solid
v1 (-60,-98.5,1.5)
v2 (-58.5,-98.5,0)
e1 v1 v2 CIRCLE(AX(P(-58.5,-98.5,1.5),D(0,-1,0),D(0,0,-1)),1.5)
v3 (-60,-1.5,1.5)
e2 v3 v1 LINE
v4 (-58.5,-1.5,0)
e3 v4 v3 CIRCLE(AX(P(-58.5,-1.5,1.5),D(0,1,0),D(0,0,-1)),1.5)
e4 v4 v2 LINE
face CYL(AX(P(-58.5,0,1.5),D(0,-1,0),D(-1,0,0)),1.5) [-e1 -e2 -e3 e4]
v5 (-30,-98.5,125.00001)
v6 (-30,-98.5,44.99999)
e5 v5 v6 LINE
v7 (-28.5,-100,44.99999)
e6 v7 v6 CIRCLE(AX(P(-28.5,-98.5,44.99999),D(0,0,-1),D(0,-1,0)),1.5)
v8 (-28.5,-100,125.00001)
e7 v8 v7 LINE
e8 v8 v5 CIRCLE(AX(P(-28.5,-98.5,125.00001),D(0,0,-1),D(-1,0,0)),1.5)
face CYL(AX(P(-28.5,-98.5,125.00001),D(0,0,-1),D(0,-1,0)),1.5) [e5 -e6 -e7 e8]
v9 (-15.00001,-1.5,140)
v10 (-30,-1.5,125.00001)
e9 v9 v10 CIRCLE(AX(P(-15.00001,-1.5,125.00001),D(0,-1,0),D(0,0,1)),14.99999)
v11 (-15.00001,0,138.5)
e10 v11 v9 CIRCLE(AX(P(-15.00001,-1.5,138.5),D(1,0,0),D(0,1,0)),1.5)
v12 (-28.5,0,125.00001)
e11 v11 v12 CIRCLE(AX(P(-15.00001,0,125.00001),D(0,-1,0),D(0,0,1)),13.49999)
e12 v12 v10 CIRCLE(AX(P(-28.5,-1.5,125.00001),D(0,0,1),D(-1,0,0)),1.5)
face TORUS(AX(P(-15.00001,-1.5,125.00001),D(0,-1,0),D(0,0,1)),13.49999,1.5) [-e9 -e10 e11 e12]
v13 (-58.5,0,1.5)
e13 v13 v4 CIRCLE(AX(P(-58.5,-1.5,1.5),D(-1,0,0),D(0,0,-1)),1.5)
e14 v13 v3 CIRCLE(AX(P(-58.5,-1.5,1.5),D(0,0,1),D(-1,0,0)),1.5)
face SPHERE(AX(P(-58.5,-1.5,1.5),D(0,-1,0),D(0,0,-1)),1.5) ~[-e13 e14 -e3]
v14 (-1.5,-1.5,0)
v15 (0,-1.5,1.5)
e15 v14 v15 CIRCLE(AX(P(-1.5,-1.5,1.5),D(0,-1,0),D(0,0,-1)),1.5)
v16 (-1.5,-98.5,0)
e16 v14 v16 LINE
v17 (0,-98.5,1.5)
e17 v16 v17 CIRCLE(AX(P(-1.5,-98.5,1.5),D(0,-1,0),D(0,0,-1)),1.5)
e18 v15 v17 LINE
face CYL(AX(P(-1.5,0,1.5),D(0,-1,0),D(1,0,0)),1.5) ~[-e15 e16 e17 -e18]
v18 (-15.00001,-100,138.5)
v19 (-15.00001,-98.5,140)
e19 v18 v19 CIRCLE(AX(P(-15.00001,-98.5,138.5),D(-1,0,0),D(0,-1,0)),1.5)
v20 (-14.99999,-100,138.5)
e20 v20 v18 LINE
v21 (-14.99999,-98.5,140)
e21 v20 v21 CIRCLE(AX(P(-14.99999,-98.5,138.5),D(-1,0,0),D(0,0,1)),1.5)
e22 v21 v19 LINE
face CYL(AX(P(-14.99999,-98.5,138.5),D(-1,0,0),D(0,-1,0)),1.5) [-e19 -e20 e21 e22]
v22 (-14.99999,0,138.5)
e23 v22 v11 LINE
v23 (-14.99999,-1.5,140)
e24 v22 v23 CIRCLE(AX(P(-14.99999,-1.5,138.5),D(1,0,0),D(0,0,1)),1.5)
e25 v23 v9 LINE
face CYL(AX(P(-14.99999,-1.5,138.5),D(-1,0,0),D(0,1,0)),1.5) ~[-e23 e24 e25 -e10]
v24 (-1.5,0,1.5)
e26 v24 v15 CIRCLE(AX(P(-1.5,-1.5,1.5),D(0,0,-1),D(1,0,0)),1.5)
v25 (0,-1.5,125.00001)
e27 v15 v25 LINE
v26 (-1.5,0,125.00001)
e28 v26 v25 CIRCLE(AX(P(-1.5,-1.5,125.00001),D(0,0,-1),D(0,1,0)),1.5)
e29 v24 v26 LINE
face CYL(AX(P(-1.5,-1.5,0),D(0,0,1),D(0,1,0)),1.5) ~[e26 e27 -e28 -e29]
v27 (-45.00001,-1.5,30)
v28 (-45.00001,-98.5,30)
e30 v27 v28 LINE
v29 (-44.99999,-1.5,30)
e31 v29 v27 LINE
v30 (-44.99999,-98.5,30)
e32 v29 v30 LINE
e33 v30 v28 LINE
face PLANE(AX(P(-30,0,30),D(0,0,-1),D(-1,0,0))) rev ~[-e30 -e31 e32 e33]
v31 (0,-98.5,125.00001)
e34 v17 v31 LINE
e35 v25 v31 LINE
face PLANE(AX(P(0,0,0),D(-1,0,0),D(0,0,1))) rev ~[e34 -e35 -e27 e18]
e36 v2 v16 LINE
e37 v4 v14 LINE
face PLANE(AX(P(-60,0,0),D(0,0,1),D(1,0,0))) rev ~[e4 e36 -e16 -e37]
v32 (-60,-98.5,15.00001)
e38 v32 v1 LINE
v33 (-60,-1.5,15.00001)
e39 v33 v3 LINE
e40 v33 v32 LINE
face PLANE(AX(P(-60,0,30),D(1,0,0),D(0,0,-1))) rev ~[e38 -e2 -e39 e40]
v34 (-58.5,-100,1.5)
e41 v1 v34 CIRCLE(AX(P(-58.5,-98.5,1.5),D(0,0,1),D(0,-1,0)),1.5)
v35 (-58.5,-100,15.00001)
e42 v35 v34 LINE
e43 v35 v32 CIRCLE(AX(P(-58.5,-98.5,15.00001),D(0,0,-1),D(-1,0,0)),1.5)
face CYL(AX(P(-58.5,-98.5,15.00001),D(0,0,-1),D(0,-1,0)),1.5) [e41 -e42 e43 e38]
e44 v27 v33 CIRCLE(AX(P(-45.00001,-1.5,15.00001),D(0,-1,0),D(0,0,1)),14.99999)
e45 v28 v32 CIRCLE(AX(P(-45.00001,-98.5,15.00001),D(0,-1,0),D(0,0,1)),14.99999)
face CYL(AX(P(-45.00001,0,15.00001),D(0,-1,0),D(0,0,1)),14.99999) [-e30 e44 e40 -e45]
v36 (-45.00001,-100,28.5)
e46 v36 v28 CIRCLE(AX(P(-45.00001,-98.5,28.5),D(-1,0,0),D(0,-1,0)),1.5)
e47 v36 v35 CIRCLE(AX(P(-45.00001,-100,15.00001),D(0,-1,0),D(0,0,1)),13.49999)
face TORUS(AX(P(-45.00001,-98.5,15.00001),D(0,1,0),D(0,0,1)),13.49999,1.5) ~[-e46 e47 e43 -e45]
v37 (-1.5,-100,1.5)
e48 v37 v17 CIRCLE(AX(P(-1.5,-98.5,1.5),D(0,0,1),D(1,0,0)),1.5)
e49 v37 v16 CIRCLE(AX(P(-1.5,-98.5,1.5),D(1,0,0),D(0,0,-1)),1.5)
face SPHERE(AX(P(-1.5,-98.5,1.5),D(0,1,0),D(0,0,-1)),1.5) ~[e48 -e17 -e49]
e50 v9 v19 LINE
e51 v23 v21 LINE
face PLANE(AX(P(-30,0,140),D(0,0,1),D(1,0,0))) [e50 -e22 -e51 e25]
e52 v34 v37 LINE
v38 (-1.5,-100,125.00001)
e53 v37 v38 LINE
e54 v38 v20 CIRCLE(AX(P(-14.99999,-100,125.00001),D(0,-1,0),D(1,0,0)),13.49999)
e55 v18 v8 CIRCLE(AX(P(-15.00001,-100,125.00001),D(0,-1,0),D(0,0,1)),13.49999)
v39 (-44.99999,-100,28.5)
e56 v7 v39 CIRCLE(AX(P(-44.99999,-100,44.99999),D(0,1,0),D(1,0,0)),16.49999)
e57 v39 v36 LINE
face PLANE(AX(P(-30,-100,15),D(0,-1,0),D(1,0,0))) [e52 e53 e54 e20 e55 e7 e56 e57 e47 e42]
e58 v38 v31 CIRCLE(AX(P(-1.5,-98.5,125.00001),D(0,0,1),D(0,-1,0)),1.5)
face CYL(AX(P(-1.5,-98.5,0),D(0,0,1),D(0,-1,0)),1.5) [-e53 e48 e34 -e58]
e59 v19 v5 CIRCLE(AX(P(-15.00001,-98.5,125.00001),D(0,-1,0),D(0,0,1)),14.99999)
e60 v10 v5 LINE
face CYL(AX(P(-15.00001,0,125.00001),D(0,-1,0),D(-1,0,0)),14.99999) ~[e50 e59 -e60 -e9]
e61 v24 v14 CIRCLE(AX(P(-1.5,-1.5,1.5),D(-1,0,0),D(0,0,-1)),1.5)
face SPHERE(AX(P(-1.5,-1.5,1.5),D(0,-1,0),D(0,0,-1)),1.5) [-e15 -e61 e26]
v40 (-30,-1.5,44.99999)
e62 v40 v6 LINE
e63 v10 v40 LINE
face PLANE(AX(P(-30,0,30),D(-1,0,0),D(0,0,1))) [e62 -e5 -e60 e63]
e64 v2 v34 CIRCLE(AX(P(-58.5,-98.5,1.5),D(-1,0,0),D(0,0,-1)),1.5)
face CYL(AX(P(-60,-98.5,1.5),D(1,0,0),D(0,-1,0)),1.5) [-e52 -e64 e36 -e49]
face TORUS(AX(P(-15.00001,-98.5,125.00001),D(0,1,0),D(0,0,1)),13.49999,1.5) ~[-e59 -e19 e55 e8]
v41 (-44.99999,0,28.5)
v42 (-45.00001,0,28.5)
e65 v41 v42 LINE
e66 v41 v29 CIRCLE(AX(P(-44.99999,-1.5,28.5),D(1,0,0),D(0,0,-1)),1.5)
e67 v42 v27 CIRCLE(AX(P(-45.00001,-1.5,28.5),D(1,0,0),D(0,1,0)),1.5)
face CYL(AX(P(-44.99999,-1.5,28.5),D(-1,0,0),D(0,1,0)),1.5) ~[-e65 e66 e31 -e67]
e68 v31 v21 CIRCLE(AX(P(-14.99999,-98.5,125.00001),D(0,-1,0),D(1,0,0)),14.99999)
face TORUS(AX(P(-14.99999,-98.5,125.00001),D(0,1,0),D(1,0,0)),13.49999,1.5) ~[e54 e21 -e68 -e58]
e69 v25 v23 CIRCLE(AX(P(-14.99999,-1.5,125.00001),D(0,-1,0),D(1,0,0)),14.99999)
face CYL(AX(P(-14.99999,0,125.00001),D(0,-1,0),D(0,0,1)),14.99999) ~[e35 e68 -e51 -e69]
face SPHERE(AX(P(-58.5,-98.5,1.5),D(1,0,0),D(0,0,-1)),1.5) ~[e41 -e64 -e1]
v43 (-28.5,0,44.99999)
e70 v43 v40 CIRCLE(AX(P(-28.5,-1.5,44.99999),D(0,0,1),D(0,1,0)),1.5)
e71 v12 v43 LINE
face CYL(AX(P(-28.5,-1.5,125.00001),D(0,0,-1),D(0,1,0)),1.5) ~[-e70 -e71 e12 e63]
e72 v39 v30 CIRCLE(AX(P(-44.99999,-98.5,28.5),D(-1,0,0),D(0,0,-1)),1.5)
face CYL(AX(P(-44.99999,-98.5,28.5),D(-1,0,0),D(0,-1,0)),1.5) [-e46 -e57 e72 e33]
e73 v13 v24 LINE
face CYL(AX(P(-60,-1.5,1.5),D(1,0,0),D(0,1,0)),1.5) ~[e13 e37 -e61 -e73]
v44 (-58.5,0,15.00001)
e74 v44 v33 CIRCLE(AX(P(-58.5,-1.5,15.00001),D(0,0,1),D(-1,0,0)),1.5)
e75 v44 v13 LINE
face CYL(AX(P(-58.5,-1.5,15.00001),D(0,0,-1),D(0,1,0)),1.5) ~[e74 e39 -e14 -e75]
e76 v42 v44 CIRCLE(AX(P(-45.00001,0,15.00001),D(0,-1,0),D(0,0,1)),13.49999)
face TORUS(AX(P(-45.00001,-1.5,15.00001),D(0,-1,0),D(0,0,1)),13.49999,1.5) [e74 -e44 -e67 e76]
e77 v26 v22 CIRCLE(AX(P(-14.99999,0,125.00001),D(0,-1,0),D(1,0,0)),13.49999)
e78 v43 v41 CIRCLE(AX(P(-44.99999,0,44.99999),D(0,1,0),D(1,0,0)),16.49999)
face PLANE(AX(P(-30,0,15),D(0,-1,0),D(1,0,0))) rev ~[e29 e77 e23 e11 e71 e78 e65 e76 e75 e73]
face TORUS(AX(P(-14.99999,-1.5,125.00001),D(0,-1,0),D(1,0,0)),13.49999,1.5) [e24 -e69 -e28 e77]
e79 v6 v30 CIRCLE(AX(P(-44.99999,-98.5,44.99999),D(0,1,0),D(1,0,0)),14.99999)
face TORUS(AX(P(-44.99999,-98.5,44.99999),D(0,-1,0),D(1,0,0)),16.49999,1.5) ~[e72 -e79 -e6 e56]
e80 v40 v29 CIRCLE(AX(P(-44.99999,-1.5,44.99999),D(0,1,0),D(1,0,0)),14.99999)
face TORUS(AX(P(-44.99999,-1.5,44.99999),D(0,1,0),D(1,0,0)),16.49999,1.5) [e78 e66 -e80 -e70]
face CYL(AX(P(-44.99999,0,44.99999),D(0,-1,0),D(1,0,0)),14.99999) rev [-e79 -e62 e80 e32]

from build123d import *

# Parameters (mm, degrees)
F0_W     = 30
F0_H     = 110
F1_DEPTH = 100
F2_R     = 14.99999
F3_R     = 14.99999
F4_R     = 1.5


# Not quite as in the source:
# - a fillet or chamfer is up to 0.001 mm smaller than in the source, because OpenCascade refuses the exact size


with BuildPart() as f1:
    # F0 (on Front) → F1 (new body)
    with BuildSketch(Plane.XZ):
        Polygon((-60, 0), (0, 0), (0, 30), (-30, 30), (-60, 30), align=None)
        with Locations((-15, 85)):
            Rectangle(F0_W, F0_H)
    extrude(amount=F1_DEPTH)

    # F2 (radius 15 in the source; OpenCascade refuses exactly that, so slightly less here)
    f2_edges = [f1.edges().sort_by_distance(p)[0] for p in [
        (-30, -50, 30),
        (-60, -50, 30),
    ]]
    fillet(f2_edges, radius=F2_R)

    # F3 (radius 15 in the source; OpenCascade refuses exactly that, so slightly less here)
    f3_edges = [f1.edges().sort_by_distance(p)[0] for p in [
        (-30, -50, 140),
        (0, -50, 140),
    ]]
    fillet(f3_edges, radius=F3_R)

    # F4
    f4_edges = [f1.edges().sort_by_distance(p)[0] for p in [
        (0, -50, 0),
        (-30, -100, 0),
        (-60, -50, 0),
        (-30, 0, 0),
        (0, -100, 62.500005),
        (0, 0, 62.500005),
    ]]
    fillet(f4_edges, radius=F4_R)


solid = f1.part
